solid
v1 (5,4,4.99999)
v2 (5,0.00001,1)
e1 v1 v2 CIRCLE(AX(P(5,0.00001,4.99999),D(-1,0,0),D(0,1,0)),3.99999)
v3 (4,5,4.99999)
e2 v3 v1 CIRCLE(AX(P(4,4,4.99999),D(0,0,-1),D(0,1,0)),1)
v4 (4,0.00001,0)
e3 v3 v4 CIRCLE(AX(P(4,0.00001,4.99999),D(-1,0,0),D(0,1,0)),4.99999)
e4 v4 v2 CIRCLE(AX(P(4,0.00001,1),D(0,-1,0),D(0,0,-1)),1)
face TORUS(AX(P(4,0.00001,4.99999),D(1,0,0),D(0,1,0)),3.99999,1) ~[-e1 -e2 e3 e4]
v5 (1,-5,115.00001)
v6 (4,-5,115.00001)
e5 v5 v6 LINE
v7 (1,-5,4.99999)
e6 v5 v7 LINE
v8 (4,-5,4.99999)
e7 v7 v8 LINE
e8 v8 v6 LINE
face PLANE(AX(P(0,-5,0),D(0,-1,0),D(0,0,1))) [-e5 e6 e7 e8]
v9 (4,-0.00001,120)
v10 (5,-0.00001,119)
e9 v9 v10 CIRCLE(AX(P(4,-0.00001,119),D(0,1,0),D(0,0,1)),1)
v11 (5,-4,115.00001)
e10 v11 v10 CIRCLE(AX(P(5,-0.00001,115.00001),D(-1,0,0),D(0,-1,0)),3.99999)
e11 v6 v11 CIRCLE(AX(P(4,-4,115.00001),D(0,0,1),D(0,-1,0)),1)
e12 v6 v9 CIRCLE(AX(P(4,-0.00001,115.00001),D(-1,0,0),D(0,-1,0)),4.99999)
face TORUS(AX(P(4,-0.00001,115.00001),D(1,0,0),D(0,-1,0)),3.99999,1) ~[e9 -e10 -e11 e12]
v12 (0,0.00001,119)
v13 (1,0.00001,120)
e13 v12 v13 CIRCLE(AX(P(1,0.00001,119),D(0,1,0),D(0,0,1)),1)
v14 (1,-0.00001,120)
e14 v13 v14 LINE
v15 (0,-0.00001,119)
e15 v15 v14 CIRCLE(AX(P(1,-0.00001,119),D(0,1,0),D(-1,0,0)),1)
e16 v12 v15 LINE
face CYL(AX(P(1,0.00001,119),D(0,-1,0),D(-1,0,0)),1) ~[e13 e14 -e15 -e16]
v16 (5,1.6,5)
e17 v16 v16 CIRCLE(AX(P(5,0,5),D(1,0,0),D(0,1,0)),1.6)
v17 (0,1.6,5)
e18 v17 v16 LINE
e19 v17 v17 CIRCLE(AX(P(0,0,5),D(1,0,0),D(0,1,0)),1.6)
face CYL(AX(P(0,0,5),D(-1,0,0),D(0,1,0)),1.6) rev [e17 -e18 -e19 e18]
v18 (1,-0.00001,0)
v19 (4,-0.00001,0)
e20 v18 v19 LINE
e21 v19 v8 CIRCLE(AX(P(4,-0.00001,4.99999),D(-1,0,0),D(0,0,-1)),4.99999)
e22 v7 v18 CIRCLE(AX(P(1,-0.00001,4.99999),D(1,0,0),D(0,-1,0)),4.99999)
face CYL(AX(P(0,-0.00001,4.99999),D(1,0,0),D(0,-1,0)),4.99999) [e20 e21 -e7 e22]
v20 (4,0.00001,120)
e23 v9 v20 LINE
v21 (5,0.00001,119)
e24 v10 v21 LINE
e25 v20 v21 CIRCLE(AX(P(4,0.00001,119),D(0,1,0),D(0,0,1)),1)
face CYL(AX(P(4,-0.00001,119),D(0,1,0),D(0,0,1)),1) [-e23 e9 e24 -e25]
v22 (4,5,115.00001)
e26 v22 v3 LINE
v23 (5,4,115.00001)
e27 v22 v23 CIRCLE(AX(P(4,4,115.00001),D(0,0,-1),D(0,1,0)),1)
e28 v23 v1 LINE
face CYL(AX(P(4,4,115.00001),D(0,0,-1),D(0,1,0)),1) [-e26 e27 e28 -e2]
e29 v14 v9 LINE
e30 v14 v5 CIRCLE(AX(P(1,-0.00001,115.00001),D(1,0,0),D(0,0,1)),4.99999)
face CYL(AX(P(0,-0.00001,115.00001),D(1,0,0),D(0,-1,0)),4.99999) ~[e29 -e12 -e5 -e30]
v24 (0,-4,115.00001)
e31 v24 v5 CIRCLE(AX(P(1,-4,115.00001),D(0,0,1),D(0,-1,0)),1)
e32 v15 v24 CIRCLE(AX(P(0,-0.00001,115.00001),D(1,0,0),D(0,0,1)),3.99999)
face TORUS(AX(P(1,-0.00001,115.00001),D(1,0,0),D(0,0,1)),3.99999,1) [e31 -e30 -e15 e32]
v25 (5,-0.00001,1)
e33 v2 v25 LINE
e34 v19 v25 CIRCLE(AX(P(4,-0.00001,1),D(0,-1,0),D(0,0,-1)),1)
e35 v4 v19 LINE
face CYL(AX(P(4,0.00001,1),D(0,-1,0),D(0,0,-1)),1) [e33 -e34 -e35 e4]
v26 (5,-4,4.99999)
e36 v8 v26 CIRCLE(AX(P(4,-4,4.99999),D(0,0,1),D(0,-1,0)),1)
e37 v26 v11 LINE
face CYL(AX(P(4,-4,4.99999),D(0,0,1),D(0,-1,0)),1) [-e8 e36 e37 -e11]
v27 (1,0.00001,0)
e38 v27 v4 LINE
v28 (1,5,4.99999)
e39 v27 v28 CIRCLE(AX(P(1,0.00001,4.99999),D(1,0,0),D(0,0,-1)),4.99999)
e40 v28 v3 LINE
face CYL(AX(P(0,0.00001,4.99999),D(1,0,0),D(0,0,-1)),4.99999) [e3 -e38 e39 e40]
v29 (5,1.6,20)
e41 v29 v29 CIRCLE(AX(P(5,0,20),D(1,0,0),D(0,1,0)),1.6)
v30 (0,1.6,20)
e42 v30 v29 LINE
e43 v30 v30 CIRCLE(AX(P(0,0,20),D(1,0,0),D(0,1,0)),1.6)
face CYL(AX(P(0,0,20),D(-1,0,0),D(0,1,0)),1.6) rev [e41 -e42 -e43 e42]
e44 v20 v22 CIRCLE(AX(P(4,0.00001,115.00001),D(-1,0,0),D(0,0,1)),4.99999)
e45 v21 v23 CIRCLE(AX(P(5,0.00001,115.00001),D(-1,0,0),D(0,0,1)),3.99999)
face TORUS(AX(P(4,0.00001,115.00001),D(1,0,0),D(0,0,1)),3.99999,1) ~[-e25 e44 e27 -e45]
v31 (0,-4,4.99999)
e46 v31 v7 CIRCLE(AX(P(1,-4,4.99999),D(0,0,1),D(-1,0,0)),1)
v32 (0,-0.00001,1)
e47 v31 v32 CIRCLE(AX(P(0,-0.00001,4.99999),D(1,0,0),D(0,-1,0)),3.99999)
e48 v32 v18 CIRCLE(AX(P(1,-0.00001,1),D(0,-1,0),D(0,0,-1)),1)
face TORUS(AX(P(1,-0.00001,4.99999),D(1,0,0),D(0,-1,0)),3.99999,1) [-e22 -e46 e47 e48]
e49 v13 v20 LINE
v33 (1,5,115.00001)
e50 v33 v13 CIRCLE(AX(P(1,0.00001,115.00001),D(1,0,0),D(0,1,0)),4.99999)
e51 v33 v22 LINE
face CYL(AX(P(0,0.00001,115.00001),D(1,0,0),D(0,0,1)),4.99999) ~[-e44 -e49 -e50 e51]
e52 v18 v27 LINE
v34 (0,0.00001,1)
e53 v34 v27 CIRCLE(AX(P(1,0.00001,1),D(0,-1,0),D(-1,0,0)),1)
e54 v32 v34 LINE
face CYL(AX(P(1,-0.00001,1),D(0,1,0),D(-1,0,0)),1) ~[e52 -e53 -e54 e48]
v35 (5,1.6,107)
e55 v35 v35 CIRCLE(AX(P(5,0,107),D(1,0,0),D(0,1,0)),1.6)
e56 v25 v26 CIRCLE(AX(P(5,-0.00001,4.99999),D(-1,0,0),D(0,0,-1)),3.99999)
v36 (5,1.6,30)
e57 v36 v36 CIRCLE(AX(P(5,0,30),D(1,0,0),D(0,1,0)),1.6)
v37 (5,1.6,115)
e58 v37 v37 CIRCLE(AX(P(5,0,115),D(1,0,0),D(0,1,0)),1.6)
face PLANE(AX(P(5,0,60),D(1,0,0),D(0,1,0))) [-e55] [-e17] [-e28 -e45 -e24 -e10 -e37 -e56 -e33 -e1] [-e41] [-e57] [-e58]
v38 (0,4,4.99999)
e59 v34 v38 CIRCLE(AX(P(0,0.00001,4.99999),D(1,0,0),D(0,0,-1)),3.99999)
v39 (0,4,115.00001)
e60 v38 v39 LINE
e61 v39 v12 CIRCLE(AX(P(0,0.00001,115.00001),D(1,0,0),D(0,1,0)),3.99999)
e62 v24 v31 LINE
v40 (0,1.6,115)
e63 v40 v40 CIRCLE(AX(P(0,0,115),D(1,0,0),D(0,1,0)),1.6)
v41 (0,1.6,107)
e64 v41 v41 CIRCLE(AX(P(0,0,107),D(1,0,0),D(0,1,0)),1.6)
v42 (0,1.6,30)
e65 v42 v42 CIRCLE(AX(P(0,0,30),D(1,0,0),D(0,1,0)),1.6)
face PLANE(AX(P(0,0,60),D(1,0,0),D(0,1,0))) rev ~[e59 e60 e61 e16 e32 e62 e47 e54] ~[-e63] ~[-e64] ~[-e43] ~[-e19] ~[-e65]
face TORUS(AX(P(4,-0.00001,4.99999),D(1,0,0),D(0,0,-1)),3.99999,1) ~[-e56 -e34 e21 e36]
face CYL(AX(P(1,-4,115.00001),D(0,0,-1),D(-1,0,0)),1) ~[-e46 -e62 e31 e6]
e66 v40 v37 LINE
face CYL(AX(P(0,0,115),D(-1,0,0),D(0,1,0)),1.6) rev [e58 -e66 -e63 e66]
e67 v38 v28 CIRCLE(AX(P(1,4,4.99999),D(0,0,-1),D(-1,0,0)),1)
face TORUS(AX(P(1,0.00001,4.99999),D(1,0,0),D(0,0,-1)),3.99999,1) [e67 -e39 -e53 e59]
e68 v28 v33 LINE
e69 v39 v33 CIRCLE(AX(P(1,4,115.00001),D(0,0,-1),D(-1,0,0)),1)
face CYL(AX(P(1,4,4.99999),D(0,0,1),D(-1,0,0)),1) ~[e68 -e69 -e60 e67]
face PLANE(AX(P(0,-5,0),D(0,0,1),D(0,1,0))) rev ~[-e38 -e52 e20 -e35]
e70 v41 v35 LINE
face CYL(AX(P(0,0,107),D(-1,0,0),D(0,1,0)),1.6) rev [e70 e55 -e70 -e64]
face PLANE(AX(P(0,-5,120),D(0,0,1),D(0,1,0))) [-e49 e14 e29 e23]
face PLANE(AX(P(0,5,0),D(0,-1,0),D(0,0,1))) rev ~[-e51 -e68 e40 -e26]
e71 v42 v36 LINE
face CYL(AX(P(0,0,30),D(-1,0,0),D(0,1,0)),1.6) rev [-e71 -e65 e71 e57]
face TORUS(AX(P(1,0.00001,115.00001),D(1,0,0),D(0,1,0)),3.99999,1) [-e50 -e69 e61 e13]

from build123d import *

# Parameters (mm, degrees)
F0_W     = 10
F0_H     = 120
F0_R     = 1.6
F1_DEPTH = 5
F2_R     = 4.99999
F3_R     = 1


# Not quite as in the source:
# - a fillet or chamfer is up to 0.001 mm smaller than in the source, because OpenCascade refuses the exact size


with BuildPart() as f1:
    # F0 (on Right) → F1 (new body)
    with BuildSketch(Plane.YZ):
        with Locations((0, 60)):
            Rectangle(F0_W, F0_H)
        with Locations((0, 5)):
            Circle(F0_R, mode=Mode.SUBTRACT)
        with Locations((0, 20)):
            Circle(F0_R, mode=Mode.SUBTRACT)
        with Locations((0, 30)):
            Circle(F0_R, mode=Mode.SUBTRACT)
        with Locations((0, 107)):
            Circle(F0_R, mode=Mode.SUBTRACT)
        with Locations((0, 115)):
            Circle(F0_R, mode=Mode.SUBTRACT)
    extrude(amount=F1_DEPTH)

    # F2 (radius 5 in the source; OpenCascade refuses exactly that, so slightly less here)
    f2_edges = [f1.edges().sort_by_distance(p)[0] for p in [
        (2.5, 5, 0),
        (2.5, -5, 0),
        (2.5, 5, 120),
        (2.5, -5, 120),
    ]]
    fillet(f2_edges, radius=F2_R)

    # F3
    f3_edges = [f1.edges().sort_by_distance(p)[0] for p in [
        (5, -3.535537, 118.535537),
        (0, 5, 60),
    ]]
    fillet(f3_edges, radius=F3_R)


solid = f1.part
